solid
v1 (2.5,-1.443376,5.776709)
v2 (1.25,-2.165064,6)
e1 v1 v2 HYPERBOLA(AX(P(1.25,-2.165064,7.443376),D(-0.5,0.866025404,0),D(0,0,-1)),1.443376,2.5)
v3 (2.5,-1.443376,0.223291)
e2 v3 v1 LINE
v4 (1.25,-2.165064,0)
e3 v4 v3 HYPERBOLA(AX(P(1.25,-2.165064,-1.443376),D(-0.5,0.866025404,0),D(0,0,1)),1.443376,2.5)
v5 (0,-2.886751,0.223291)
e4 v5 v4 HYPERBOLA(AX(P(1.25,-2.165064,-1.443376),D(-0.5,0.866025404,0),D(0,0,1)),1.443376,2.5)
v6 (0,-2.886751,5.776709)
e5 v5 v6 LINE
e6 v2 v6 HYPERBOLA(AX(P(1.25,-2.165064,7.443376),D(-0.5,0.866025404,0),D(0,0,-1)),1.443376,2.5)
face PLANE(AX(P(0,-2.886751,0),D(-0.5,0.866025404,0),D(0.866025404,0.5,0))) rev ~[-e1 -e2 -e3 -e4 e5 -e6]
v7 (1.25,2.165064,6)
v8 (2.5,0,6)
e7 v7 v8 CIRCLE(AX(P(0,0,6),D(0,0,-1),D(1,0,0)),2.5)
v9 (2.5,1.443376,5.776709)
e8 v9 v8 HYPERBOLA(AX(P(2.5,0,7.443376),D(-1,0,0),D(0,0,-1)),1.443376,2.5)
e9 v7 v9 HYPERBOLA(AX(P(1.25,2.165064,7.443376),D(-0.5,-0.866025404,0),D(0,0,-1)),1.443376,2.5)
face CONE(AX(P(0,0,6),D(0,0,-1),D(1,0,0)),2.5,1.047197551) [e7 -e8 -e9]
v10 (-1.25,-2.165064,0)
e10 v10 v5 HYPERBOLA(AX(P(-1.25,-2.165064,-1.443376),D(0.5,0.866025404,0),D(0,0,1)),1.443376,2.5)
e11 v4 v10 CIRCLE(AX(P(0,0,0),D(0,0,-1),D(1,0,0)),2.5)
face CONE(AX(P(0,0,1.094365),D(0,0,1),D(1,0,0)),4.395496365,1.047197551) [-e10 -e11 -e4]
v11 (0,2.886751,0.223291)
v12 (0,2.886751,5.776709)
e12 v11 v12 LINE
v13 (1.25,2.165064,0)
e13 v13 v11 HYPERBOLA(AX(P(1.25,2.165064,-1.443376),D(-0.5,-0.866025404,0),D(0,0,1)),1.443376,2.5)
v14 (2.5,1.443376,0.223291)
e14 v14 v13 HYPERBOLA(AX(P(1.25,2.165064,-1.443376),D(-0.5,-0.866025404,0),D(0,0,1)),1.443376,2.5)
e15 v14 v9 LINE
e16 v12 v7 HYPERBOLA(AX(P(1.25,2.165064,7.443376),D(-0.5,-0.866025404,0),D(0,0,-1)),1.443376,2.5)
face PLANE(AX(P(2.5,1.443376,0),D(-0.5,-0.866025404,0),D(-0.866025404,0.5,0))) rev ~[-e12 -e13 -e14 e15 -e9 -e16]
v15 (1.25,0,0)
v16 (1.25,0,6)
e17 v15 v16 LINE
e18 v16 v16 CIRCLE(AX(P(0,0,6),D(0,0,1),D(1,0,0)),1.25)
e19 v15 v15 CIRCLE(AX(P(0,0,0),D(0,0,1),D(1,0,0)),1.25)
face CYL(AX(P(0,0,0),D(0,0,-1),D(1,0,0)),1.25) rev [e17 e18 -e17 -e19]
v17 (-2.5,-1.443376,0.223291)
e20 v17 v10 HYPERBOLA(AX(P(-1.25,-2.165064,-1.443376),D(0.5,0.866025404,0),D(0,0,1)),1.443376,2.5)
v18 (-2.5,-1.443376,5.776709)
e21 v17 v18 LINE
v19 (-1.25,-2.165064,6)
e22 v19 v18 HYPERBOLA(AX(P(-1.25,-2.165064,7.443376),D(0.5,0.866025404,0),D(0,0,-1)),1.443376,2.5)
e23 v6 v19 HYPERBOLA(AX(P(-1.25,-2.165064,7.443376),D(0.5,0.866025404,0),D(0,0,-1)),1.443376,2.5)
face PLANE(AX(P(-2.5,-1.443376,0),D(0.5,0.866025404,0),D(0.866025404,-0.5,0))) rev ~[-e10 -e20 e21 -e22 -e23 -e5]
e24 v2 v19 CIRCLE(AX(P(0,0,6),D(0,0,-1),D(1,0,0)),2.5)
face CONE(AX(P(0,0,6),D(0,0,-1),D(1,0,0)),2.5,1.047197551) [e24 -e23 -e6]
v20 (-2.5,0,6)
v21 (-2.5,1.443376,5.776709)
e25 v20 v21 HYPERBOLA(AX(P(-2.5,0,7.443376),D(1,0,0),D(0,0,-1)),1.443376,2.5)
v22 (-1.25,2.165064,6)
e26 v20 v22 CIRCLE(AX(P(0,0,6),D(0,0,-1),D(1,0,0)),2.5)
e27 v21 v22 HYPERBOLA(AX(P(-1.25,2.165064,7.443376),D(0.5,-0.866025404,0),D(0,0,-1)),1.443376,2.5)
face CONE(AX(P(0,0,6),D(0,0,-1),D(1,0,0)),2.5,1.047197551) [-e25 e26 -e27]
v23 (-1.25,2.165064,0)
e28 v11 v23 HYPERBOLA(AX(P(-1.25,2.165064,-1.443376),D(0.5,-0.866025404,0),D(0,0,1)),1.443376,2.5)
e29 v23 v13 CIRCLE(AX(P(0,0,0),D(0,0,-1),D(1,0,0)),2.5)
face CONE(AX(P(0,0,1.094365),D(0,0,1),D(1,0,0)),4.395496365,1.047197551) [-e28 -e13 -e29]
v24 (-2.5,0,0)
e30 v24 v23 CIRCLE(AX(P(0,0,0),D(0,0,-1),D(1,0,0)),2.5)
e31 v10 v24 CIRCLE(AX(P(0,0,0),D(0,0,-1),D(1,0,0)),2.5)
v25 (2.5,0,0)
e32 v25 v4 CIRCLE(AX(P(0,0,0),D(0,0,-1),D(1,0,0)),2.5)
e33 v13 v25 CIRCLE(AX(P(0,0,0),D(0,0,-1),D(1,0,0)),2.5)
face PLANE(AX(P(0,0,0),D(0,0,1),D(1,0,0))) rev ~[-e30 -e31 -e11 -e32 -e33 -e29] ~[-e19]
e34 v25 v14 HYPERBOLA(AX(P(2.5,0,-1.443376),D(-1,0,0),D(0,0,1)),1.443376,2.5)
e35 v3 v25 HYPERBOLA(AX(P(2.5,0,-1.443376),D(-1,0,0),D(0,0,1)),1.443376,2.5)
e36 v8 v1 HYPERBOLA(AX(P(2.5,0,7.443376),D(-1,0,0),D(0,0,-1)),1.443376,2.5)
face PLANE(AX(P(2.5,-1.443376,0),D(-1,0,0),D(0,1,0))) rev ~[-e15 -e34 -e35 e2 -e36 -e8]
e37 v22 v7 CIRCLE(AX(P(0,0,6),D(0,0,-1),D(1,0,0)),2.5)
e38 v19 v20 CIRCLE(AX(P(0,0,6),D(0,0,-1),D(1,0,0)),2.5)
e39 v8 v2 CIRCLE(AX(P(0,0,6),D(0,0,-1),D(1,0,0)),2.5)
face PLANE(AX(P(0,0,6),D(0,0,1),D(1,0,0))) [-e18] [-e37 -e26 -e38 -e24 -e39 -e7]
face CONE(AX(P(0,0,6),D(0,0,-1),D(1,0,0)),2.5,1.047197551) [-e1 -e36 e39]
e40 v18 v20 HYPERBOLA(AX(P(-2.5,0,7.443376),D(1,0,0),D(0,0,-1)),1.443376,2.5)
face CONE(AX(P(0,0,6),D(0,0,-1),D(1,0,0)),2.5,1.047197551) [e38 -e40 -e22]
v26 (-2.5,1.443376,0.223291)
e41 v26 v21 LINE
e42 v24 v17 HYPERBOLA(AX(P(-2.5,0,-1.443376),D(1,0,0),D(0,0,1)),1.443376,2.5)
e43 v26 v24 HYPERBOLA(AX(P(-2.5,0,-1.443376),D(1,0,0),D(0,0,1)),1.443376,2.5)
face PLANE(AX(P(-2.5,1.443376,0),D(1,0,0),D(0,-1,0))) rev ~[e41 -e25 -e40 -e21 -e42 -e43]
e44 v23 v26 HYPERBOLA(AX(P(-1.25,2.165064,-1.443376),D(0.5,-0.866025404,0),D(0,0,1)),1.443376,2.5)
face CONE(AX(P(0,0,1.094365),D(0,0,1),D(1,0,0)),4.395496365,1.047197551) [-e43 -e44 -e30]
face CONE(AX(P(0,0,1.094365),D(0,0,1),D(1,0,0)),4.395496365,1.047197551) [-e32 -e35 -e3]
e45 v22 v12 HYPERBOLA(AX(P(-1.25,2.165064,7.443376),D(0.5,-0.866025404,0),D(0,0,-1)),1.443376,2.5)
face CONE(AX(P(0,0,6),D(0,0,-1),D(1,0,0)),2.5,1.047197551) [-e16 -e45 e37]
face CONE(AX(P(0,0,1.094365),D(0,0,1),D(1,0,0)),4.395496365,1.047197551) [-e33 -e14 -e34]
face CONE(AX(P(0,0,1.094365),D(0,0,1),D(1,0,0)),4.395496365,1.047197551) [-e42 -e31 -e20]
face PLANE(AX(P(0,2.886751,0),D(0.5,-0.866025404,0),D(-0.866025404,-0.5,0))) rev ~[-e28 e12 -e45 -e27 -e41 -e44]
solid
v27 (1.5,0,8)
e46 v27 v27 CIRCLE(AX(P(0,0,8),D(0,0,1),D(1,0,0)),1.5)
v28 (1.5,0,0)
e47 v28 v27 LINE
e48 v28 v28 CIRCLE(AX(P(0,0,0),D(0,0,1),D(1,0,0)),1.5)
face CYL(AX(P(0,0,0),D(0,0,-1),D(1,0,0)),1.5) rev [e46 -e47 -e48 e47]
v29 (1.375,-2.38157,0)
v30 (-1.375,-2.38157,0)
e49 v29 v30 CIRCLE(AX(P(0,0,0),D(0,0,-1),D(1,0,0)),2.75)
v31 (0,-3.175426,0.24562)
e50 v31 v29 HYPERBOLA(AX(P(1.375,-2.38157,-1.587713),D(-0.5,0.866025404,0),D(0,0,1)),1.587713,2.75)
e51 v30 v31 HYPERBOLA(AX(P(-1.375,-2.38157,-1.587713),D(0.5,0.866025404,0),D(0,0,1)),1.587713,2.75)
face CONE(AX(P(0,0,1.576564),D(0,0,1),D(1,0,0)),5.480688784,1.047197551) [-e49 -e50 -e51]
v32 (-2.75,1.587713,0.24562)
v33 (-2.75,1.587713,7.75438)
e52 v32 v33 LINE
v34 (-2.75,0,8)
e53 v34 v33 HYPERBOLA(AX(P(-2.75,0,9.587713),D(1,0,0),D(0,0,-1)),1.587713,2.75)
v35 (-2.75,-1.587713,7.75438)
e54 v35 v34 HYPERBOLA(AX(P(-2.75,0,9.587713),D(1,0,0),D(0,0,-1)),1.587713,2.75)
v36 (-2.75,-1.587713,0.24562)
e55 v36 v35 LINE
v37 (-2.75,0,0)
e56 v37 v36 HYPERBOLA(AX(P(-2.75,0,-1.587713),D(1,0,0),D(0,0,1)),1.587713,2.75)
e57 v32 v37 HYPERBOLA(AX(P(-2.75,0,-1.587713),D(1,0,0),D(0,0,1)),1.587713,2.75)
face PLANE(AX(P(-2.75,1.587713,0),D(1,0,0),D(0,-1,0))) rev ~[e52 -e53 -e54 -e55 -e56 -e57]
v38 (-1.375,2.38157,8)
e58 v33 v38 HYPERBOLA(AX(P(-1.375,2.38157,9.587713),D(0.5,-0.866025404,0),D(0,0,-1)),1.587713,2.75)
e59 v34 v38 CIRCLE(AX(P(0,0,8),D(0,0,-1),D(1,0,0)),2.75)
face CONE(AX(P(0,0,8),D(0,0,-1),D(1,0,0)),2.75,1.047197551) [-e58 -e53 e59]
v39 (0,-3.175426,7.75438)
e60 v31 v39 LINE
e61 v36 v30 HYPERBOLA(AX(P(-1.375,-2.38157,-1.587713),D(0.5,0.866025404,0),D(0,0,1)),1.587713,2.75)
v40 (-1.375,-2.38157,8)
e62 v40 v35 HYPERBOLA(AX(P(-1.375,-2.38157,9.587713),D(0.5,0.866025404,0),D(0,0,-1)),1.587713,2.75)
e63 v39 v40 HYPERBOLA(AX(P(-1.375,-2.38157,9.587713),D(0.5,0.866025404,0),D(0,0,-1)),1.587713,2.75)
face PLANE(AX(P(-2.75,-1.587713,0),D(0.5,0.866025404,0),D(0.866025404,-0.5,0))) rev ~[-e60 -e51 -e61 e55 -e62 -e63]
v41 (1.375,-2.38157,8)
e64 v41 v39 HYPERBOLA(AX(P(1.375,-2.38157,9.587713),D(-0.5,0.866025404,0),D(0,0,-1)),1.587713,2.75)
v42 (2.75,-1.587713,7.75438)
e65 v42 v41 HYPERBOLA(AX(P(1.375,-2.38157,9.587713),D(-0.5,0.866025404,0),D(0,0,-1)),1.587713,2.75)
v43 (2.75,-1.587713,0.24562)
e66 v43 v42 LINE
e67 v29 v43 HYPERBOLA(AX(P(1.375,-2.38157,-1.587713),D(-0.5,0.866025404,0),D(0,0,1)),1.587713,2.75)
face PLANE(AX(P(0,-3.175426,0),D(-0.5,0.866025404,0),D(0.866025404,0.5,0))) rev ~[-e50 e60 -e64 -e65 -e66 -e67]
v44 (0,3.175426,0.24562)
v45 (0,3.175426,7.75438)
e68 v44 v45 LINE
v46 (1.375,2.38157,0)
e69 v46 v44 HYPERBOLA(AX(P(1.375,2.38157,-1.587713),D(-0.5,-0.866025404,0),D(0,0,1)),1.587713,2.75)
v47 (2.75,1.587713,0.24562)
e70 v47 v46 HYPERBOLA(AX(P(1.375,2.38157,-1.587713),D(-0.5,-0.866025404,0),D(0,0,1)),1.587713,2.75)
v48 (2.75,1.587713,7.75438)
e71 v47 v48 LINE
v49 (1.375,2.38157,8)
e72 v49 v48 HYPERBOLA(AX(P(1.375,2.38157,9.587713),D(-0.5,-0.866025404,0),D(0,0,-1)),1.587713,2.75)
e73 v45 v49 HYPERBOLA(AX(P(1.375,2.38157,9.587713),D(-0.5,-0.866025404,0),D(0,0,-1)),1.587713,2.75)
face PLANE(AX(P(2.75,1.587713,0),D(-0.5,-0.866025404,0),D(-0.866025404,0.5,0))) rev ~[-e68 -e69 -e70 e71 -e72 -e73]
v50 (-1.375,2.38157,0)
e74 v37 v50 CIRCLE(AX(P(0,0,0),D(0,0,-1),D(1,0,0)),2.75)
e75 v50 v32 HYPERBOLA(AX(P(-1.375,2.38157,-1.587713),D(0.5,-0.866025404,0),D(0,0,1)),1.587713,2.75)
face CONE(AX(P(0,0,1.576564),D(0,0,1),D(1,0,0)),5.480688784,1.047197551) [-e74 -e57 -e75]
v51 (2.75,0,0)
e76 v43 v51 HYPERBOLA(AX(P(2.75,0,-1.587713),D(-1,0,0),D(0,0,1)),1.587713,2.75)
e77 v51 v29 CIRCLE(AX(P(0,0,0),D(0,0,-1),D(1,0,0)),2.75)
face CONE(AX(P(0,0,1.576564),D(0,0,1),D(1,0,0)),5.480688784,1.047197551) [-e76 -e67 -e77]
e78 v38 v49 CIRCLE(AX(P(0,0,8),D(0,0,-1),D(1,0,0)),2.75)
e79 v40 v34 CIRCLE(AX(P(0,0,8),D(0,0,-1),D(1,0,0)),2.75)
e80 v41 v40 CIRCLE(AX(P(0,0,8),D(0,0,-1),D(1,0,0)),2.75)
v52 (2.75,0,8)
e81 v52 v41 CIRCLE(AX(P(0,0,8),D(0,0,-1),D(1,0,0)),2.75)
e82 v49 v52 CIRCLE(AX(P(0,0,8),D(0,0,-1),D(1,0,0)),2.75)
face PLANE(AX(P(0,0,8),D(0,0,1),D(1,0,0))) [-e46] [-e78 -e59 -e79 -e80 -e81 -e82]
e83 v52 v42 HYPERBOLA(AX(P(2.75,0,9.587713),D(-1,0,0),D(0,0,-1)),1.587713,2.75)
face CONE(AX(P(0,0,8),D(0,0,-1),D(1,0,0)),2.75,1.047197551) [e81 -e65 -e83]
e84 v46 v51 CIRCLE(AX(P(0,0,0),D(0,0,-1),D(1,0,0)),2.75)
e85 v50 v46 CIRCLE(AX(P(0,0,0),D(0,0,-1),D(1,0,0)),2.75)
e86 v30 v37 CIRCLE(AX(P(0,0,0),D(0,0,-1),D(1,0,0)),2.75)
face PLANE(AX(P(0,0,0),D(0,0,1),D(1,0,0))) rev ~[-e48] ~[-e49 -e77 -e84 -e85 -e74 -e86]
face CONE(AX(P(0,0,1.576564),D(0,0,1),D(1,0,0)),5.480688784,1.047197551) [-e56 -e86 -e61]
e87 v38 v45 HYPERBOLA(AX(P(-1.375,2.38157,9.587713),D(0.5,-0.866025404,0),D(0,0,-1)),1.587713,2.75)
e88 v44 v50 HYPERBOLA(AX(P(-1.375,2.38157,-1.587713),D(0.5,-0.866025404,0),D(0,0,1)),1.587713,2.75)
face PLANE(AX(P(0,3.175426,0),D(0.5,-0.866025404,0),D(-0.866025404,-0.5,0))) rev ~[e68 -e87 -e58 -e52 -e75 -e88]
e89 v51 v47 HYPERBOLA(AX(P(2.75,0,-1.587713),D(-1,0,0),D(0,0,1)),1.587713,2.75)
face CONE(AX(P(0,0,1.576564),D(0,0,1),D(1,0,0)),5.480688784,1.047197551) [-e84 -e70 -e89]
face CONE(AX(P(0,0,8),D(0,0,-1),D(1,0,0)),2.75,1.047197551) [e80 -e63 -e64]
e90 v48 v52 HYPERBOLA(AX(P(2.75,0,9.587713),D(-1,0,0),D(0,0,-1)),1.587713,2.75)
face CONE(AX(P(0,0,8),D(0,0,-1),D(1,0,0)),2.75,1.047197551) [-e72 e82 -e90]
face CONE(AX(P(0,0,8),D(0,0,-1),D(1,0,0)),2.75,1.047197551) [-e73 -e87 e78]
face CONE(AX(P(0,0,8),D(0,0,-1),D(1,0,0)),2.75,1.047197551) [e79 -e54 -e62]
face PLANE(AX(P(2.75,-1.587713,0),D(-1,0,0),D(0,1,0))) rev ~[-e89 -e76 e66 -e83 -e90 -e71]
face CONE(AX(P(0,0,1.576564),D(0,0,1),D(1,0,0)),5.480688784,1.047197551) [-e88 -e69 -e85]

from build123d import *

# Parameters (mm, degrees)
F1_R     = 1.5
F2_DEPTH = 8
F5_R     = 1.25
F6_DEPTH = 6


with BuildPart() as f2:
    # F1 (on Top) → F2 (new body)
    with BuildSketch(Plane.XY):
        Polygon((2.75, 1.5877132403), (0, 3.1754264805), (-2.75, 1.5877132403), (-2.75, -1.5877132403), (0, -3.1754264805), (2.75, -1.5877132403), align=None)
        Circle(F1_R, mode=Mode.SUBTRACT)
    extrude(amount=F2_DEPTH)

    # F3 (on Front) → F4 (revolve, cut)
    with BuildSketch(Plane.XZ):
        Polygon((5.4806887836, 8), (2.75, 8), (5.4806887836, 6.4234360957), align=None)
        Polygon((5.4806887836, 1.5765639043), (2.75, 0), (5.4806887836, 0), align=None)
    revolve(axis=Axis((0, 0, 4), (0, 0, -1)), mode=Mode.SUBTRACT)


with BuildPart() as f6:
    # F5 (on Top) → F6 (new body)
    with BuildSketch(Plane.XY):
        Polygon((0, -2.8867513459), (2.5, -1.443375673), (2.5, 1.443375673), (0, 2.8867513459), (-2.5, 1.443375673), (-2.5, -1.443375673), align=None)
        Circle(F5_R, mode=Mode.SUBTRACT)
    extrude(amount=F6_DEPTH)

    # F7 (on Front) → F8 (revolve, cut)
    with BuildSketch(Plane.XZ):
        Polygon((4.3954963651, 6), (2.5, 6), (4.3954963651, 4.9056346634), align=None)
        Polygon((2.5, 0), (4.3954963651, 0), (4.3954963651, 1.0943653366), align=None)
    revolve(axis=Axis((0, 0, 3), (0, 0, -1)), mode=Mode.SUBTRACT)


solid = Compound([f2.part, f6.part])
